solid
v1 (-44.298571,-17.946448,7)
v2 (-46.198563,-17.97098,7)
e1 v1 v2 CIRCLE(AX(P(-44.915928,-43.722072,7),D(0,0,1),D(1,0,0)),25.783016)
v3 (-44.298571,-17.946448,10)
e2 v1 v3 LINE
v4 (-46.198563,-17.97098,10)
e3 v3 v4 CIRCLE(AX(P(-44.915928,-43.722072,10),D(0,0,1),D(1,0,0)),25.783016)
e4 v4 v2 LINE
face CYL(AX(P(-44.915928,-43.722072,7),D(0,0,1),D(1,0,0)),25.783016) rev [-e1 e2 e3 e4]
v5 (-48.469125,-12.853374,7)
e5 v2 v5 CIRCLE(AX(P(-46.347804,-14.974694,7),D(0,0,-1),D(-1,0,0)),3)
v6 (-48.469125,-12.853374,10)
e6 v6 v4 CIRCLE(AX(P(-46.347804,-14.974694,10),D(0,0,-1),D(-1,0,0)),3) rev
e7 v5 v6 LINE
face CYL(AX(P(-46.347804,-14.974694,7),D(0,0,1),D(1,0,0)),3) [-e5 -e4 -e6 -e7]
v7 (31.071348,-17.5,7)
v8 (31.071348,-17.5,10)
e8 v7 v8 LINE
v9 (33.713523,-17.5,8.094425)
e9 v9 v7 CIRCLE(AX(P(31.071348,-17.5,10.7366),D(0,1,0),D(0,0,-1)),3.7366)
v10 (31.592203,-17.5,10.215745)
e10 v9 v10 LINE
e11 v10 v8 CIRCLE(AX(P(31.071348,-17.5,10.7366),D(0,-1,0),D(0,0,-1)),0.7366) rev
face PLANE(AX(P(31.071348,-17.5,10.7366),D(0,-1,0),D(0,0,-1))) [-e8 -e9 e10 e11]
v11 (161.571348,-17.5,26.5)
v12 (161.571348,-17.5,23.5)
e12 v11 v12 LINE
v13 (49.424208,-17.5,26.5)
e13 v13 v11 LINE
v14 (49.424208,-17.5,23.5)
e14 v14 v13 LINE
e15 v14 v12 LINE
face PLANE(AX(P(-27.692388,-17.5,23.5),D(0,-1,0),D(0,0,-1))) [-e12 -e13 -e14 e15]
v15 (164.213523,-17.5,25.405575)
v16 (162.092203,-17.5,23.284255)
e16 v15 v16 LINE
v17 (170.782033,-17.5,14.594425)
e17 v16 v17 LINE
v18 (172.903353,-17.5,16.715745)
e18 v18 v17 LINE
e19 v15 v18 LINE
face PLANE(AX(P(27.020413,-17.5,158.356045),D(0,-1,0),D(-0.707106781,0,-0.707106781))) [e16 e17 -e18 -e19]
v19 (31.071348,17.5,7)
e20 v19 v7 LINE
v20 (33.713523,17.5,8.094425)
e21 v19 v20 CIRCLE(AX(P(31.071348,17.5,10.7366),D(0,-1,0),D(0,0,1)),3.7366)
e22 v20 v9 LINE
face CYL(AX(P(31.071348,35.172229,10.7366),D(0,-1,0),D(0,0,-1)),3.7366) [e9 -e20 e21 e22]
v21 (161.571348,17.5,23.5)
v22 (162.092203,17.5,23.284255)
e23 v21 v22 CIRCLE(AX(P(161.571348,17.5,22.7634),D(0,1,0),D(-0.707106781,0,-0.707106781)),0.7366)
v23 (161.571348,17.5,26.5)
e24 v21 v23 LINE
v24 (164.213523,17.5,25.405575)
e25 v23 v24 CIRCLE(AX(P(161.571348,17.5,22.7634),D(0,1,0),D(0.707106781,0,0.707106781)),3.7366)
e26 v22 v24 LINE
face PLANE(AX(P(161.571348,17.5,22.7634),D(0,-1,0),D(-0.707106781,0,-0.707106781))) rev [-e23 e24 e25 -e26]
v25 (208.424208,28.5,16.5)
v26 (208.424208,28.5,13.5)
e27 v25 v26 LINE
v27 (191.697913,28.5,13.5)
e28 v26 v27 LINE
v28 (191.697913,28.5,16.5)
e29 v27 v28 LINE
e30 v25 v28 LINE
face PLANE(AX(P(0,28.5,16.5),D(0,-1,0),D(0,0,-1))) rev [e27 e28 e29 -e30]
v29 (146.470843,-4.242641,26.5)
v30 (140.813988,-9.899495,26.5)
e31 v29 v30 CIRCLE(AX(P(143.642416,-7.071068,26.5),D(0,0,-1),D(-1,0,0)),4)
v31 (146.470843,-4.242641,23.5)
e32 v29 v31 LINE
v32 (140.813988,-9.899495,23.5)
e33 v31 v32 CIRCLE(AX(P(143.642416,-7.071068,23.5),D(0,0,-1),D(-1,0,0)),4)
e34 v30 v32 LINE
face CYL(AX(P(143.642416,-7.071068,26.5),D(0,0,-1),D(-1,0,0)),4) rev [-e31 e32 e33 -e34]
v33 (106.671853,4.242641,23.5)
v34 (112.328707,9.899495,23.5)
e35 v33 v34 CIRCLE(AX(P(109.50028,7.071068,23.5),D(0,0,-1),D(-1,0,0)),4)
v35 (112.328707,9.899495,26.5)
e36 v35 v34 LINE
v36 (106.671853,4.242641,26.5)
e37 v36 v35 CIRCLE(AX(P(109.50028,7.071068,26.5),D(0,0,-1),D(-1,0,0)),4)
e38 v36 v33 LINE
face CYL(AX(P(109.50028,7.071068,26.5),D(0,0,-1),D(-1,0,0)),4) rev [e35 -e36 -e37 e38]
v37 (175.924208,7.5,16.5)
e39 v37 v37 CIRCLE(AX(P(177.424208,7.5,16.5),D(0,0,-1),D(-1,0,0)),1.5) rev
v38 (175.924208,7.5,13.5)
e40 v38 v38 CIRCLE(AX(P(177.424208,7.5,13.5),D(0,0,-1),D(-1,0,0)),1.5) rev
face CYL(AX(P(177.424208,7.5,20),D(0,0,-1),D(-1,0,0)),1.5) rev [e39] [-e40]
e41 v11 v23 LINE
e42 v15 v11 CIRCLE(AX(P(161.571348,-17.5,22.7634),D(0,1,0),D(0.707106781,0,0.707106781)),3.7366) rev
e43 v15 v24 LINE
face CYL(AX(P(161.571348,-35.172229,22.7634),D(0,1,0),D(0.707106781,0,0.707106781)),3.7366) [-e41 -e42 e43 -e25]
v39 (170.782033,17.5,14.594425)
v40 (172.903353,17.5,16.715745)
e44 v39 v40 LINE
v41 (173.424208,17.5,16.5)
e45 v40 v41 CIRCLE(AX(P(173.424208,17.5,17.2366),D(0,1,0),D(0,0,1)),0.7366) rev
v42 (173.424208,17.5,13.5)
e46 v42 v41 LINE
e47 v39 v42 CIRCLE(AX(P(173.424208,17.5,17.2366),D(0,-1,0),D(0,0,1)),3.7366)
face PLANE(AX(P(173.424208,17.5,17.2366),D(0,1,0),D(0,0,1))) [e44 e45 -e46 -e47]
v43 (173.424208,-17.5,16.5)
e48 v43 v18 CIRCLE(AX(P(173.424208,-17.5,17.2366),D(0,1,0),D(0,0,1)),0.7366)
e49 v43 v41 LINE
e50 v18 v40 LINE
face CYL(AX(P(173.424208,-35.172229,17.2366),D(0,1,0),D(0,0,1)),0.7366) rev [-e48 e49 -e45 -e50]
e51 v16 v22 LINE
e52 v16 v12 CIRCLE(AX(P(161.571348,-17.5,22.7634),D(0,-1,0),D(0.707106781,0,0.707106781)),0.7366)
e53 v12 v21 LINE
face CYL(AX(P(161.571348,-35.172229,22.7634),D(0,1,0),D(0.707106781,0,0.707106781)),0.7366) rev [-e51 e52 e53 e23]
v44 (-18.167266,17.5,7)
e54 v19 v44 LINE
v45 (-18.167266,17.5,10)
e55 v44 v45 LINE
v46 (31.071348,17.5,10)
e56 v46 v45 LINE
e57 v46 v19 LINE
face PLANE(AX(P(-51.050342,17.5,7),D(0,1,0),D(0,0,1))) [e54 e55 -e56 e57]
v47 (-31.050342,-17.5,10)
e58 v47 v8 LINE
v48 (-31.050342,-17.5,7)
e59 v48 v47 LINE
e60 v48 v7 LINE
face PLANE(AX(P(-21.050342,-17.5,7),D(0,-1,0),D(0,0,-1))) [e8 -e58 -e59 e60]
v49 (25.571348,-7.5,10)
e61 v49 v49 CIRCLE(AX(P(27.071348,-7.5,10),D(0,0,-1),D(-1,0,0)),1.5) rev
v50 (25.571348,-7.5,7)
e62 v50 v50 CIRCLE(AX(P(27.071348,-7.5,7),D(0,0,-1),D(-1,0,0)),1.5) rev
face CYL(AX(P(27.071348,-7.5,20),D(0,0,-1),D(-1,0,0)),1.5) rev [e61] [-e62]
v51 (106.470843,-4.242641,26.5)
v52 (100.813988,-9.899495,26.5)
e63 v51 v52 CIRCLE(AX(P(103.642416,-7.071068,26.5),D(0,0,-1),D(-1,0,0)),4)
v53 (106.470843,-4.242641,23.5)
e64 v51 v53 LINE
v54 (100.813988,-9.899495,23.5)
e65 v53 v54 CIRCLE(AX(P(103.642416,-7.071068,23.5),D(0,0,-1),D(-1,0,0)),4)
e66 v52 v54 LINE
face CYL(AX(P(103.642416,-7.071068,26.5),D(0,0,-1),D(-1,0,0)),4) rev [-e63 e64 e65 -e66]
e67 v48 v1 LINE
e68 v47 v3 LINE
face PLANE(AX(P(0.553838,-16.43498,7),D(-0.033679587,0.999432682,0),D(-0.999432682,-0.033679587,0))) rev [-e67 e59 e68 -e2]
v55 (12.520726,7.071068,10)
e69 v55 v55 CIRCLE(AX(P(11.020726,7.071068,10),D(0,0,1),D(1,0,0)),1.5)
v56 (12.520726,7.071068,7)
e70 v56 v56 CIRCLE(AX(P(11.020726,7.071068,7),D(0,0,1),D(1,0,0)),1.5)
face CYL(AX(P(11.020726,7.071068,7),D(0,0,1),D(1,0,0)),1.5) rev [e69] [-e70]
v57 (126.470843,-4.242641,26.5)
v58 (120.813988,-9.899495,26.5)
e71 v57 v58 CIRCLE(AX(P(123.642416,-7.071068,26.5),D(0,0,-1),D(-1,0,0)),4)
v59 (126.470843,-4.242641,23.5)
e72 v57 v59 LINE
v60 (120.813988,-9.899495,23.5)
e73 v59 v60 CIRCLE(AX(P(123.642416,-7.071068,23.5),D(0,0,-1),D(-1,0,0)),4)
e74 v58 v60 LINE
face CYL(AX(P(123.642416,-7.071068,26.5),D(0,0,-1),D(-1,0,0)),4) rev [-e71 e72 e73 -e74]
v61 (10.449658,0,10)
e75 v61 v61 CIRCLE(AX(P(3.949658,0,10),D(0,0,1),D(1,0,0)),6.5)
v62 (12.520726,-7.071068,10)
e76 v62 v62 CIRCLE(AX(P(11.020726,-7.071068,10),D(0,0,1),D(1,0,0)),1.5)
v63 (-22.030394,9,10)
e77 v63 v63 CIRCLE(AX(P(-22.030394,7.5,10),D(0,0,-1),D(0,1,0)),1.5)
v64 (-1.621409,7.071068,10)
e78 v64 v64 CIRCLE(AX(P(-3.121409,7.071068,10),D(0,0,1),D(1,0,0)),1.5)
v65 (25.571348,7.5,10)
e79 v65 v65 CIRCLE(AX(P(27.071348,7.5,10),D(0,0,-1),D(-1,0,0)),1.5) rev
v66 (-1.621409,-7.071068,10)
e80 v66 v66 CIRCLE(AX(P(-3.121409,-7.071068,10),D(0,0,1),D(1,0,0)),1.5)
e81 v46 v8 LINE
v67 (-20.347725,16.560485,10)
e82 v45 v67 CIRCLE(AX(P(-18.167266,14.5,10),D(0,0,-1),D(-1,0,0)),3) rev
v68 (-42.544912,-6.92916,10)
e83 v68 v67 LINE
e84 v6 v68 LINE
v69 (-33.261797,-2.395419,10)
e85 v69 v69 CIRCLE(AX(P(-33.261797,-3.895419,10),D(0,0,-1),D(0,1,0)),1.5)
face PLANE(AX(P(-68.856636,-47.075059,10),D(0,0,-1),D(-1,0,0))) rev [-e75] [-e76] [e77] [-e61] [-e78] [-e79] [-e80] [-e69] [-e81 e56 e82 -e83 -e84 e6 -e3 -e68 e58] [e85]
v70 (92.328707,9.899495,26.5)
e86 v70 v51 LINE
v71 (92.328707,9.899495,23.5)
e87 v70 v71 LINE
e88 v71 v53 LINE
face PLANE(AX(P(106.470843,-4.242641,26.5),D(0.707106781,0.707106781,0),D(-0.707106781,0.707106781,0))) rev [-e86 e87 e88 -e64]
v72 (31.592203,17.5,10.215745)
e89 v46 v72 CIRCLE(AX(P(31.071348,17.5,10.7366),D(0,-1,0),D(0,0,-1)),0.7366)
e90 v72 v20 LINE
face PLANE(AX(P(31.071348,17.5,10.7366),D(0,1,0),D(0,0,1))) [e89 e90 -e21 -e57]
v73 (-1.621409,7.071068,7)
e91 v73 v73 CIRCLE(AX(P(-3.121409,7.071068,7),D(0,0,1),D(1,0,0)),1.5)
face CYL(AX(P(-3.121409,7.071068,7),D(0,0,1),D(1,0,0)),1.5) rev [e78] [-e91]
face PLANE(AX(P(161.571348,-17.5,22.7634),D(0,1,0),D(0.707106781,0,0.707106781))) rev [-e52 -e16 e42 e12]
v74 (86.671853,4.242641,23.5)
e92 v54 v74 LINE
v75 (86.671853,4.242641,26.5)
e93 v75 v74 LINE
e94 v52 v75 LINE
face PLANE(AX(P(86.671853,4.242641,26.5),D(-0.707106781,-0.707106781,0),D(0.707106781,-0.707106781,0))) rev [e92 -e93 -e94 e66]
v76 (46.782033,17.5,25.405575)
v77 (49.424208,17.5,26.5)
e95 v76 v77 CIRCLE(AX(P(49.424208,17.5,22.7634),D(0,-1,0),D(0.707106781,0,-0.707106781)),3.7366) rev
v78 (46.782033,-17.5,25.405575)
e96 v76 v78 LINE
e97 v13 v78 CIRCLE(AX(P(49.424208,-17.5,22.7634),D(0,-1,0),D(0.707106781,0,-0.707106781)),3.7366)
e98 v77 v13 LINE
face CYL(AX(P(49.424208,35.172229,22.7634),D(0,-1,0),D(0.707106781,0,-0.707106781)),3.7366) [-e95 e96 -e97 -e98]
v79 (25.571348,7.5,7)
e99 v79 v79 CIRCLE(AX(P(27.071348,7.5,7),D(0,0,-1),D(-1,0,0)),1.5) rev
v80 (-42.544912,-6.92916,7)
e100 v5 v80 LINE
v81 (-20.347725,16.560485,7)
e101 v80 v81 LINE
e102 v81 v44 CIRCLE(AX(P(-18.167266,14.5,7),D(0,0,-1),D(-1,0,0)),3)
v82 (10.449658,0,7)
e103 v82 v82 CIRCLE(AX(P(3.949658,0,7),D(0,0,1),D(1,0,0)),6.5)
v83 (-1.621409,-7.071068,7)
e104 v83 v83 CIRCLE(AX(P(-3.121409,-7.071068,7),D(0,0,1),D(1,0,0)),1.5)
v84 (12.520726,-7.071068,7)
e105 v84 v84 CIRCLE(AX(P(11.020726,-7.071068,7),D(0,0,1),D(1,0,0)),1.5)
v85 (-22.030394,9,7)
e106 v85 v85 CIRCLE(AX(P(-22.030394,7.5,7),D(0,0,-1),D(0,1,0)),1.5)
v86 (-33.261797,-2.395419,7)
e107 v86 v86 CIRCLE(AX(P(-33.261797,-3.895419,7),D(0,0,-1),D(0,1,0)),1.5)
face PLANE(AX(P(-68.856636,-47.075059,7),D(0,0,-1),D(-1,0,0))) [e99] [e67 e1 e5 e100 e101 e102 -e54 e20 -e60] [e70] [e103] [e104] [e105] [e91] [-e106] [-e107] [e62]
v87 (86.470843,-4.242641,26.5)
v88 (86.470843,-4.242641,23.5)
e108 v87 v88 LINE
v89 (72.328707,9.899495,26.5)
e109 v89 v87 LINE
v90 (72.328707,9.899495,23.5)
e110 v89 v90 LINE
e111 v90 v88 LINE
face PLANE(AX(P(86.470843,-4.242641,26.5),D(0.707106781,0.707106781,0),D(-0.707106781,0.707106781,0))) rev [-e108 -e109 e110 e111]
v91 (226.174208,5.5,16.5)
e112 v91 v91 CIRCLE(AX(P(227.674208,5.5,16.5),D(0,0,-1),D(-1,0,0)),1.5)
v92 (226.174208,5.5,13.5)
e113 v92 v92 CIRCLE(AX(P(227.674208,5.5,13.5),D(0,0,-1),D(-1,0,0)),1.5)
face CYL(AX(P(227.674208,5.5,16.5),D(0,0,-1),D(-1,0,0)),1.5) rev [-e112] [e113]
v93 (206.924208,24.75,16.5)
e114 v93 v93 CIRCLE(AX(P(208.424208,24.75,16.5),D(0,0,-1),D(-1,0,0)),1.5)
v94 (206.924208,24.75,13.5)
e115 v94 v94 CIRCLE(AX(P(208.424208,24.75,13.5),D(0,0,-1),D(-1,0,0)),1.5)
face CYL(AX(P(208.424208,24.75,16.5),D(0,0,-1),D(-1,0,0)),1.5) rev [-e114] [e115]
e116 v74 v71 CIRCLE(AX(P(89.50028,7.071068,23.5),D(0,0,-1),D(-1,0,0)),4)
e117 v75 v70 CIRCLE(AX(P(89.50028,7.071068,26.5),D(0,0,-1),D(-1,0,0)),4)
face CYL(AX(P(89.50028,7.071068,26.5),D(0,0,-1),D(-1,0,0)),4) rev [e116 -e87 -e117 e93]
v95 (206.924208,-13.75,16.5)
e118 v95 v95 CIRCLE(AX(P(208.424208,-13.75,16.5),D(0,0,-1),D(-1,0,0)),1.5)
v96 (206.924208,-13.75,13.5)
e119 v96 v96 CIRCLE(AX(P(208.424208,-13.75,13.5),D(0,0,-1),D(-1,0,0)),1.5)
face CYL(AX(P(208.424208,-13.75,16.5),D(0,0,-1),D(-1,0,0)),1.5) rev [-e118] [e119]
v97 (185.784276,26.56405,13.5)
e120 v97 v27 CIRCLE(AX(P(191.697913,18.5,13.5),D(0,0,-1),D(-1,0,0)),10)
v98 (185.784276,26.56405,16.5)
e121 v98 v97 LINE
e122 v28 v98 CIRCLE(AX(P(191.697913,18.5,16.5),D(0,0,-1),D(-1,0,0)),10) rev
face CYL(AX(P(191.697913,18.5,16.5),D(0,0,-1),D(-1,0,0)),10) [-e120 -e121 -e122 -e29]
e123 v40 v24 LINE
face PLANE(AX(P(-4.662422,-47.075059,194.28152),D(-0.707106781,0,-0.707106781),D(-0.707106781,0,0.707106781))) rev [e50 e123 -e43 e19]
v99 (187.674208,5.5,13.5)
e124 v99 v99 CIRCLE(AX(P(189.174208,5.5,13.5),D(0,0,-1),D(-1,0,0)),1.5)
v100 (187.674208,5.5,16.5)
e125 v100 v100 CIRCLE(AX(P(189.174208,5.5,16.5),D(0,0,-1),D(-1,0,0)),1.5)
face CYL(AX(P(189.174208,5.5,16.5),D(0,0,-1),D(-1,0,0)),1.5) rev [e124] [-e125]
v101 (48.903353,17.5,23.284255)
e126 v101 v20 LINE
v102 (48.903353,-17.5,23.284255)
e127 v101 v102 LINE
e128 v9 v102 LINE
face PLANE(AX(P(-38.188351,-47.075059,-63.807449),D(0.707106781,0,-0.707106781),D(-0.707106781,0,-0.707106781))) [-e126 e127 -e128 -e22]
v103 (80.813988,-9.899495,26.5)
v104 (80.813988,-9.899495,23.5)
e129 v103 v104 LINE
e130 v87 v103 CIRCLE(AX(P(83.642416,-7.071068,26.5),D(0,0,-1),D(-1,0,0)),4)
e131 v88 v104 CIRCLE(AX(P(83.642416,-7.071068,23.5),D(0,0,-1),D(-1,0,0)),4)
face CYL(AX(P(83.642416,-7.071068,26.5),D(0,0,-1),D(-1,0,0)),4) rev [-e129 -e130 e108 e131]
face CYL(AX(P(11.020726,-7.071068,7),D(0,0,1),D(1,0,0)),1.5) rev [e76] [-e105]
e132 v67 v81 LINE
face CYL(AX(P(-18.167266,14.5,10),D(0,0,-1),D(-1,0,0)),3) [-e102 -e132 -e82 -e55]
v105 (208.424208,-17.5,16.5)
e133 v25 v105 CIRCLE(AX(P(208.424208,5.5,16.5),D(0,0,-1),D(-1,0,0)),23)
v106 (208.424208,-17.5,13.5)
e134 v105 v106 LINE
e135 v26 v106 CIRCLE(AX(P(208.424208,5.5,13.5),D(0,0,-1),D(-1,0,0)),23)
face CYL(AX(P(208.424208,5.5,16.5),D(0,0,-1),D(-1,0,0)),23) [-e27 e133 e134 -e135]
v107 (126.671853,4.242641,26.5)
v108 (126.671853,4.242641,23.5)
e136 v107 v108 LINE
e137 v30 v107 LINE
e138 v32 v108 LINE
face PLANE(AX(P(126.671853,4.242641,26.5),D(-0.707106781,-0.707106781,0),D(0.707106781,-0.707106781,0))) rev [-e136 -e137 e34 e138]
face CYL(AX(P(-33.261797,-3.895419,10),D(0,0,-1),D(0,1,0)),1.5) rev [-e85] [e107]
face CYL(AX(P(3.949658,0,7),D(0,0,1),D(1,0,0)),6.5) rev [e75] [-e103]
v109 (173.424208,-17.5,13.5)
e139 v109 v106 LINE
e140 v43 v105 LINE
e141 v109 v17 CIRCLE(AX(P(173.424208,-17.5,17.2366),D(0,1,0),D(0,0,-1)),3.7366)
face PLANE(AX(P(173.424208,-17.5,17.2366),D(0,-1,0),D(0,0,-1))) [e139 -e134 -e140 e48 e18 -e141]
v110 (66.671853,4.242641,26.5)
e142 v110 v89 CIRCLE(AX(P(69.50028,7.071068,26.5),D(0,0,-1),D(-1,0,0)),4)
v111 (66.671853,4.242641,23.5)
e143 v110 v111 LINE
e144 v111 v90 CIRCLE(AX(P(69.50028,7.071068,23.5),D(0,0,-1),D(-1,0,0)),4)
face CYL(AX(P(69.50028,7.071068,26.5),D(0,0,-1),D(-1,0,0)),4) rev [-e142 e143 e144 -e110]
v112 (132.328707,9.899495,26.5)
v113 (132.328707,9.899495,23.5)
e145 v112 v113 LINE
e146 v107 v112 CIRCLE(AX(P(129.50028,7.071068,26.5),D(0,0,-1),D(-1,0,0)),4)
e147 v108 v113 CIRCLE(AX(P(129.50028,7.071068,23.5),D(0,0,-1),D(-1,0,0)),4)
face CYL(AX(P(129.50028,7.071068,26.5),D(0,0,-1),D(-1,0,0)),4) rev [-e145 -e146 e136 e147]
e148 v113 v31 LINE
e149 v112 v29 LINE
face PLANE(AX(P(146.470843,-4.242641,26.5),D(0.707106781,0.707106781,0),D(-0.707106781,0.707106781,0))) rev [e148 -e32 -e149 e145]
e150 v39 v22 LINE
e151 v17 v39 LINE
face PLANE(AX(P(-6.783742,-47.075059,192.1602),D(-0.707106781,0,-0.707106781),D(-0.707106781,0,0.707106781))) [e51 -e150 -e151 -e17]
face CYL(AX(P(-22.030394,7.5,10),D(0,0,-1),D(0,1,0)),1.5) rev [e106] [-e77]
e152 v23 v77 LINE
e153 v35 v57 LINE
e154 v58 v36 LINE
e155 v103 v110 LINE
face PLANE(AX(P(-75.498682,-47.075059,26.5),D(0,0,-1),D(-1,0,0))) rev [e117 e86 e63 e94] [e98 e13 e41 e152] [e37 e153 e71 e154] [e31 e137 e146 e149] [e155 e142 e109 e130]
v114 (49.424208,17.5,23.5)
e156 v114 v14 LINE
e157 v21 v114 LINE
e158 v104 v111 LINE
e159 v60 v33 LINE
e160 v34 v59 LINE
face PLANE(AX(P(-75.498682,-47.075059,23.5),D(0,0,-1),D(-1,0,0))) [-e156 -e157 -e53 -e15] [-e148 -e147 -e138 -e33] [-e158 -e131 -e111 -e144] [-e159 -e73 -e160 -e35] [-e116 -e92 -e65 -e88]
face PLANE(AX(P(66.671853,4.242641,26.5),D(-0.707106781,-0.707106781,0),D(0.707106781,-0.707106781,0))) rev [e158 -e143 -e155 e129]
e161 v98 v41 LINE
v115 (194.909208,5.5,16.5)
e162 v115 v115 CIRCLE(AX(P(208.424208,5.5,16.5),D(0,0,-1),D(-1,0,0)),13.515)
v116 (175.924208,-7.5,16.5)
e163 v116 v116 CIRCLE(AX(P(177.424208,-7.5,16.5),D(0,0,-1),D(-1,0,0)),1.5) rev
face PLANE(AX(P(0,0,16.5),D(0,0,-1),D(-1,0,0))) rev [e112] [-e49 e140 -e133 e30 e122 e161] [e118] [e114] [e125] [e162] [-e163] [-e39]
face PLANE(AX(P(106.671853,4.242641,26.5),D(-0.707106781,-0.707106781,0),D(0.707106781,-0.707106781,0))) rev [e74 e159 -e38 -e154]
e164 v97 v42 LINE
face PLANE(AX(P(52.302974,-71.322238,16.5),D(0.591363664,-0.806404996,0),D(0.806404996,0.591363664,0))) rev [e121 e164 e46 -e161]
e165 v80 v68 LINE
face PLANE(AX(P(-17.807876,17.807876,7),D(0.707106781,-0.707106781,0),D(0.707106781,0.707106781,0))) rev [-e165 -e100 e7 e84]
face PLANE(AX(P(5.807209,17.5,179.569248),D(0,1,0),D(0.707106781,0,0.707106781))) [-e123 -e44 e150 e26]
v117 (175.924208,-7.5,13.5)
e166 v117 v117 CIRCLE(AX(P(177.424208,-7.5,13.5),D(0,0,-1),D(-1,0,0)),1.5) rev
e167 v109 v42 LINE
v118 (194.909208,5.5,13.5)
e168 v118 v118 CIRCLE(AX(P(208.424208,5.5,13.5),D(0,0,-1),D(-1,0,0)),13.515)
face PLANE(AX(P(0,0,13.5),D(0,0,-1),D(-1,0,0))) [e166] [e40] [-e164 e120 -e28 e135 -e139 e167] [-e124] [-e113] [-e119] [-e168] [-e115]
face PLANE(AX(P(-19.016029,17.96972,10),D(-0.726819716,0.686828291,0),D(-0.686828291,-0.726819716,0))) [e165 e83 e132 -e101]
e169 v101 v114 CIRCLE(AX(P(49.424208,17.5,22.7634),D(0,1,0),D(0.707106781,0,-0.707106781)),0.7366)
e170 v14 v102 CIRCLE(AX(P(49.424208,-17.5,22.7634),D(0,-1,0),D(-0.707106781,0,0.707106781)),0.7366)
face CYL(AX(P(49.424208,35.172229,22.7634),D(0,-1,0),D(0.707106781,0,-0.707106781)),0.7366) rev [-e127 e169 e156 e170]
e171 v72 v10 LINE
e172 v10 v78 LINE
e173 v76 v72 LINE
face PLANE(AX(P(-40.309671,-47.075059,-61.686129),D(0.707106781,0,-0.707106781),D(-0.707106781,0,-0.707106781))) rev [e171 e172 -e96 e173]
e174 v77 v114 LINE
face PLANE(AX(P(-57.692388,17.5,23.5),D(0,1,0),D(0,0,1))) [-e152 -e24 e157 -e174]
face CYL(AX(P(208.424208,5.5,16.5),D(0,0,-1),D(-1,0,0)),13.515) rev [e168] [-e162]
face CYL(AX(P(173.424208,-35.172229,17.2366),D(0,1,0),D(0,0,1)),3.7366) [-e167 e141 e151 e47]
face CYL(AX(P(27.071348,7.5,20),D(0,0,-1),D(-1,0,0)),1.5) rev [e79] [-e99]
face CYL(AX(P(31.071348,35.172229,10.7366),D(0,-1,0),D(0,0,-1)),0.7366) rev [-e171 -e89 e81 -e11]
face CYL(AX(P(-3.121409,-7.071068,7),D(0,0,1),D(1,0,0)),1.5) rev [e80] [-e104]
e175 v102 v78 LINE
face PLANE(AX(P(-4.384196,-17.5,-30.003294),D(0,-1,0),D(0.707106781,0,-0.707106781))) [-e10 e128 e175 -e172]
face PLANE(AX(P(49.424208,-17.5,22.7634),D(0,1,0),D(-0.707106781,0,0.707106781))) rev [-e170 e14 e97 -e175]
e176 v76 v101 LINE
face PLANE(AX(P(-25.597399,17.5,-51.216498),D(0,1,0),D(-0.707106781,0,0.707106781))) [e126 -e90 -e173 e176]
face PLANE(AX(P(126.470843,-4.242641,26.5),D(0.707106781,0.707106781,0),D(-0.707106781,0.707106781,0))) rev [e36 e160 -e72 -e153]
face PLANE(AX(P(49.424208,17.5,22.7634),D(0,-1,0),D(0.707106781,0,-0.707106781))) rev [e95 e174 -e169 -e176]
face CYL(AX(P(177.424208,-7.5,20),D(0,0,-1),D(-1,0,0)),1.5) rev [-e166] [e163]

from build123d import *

# Parameters (mm, degrees)
SKETCH_1_R               = 6.5
SKETCH_1_R_2             = 1.5
SM_BASE_FLANGE_1_DEPTH   = 3
OTHER_START              = -17.5
OTHER_1_DEPTH            = 35
OTHER_1_2_DEPTH          = 35
SKETCH_7_W               = 142
SKETCH_7_H               = 35
EXTRUDE_1_DEPTH          = 3
OTHER_2_DEPTH            = 35
OTHER_START_2            = 8.571067912
OTHER_2_2_DEPTH          = 8.928932088
OTHER_2_3_DEPTH          = 26.071067912
OTHER_START_3            = 7
OTHER_2_4_OUTLINE_R      = 6.5
OTHER_2_4_OUTLINE_R_2    = 1.5
OTHER_2_4_DEPTH          = 3
OTHER_START_4            = 13.5
OTHER_2_5_OUTLINE_W      = 3.949658474
OTHER_2_5_OUTLINE_H      = 35
OTHER_2_5_DEPTH          = 3
SKETCH_9_W               = 40.525450659
SKETCH_9_H               = 35
CUT_EXTRUDE_1_DEPTH      = 216.548037247
EXTRUDE_START            = -6.5
SKETCH_10_R              = 13.515
SKETCH_10_R_2            = 1.5
EXTRUDE_2_DEPTH          = 3
FILLET_2_R               = 10
EXTRUDE_START_2          = -3
EXTRUDE_3_DEPTH          = 3
CUT_EXTRUDE_2_DEPTH      = 3
FILLET_3_R               = 3
SKETCH_13_R              = 1.5
CUT_EXTRUDE_3_DEPTH      = 3
CUT_EXTRUDE_4_DEPTH      = 10
CUT_EXTRUDE_4_DEPTH_BACK = 10
SKETCH_14_R              = 1.5
CUT_EXTRUDE_5_DEPTH      = 234.75556456


with BuildPart() as part:
    # 基体-法兰1: sheet metal written as solids
    # Sketch 1 → 基体-法兰1 (new body)
    with BuildSketch(Plane.XY):
        with BuildLine():
            Line((-55, -2.5), (-55, 17.5))
            Line((-55, 17.5), (-25, 17.5))
            Line((-25, 17.5), (25, 17.5))
            Line((25, 17.5), (68, 17.5))
            Line((68, 17.5), (68, -17.5))
            Line((68, -17.5), (25, -17.5))
            Line((25, -17.5), (-25, -17.5))
            Line((-25, -17.5), (-35, -17.5))
            ThreePointArc((-35, -17.5), (-44.006294251, -8.675059002), (-55, -2.5))
        make_face()
        Circle(SKETCH_1_R, mode=Mode.SUBTRACT)
        with Locations((7.071067812, 7.071067812)):
            Circle(SKETCH_1_R_2, mode=Mode.SUBTRACT)
        with Locations((7.071067812, -7.071067812)):
            Circle(SKETCH_1_R_2, mode=Mode.SUBTRACT)
        with Locations((-7.071067812, -7.071067812)):
            Circle(SKETCH_1_R_2, mode=Mode.SUBTRACT)
        with Locations((-7.071067812, 7.071067812)):
            Circle(SKETCH_1_R_2, mode=Mode.SUBTRACT)
    extrude(amount=-SM_BASE_FLANGE_1_DEPTH)

    # Other 1: read off the stored shape, not the designer's step
    # Other 1 outline → Other 1 (cut)
    with BuildSketch(Plane(origin=(0, 0, 0), x_dir=(1, 0, 0), z_dir=(0, 1, 0)).offset(OTHER_START)):
        with BuildLine():
            Line((29.763864432, 1.905575199), (31.669439631, 0))
            Line((31.669439631, 0), (68, 0))
            Line((68, 0), (68, 3))
            Line((68, 3), (27.121689234, 3))
            ThreePointArc((27.121689234, 3), (28.551624147, 2.715568261), (29.763864432, 1.905575199))
        make_face()
    extrude(amount=OTHER_1_DEPTH, mode=Mode.SUBTRACT)

    # Other 1 2 outline → Other 1 2 (add)
    with BuildSketch(Plane(origin=(0, 0, 0), x_dir=(1, 0, 0), z_dir=(0, 1, 0)).offset(OTHER_START)):
        with BuildLine():
            ThreePointArc((45.474549341, -13.5), (45.192664725, -13.443929664), (44.953694486, -13.284254855))
            Line((44.953694486, -13.284254855), (31.669439631, 0))
            Line((31.669439631, 0), (27.121689234, 0))
            ThreePointArc((27.121689234, 0), (27.40357385, -0.056070336), (27.642544089, -0.215745145))
            Line((27.642544089, -0.215745145), (42.832374142, -15.405575199))
            ThreePointArc((42.832374142, -15.405575199), (44.044614428, -16.215568261), (45.474549341, -16.5))
            Line((45.474549341, -16.5), (68, -16.5))
            Line((68, -16.5), (68, -13.5))
            Line((68, -13.5), (45.474549341, -13.5))
        make_face()
    extrude(amount=OTHER_1_2_DEPTH)

    # 草图7 → 凸台-拉伸1 (add)
    with BuildSketch(Plane.XY.offset(16.5)):
        with Locations((139, 0)):
            Rectangle(SKETCH_7_W, SKETCH_7_H)
    extrude(amount=-EXTRUDE_1_DEPTH)

    # Other 2: read off the stored shape, not the designer's step
    # Other 2 outline → Other 2 (cut)
    with BuildSketch(Plane(origin=(0, 0, 0), x_dir=(1, 0, 0), z_dir=(0, 1, 0)).offset(OTHER_START)):
        with BuildLine():
            Line((45.474549341, -16.5), (168.876457417, -16.5))
            Line((168.876457417, -16.5), (170.782032616, -14.594424801))
            ThreePointArc((170.782032616, -14.594424801), (171.994272902, -13.784431739), (173.424207815, -13.5))
            Line((173.424207815, -13.5), (45.474549341, -13.5))
            ThreePointArc((45.474549341, -13.5), (45.192664725, -13.443929664), (44.953694486, -13.284254855))
            Line((44.953694486, -13.284254855), (29.763864432, 1.905575199))
            ThreePointArc((29.763864432, 1.905575199), (28.551624147, 2.715568261), (27.121689234, 3))
            Line((27.121689234, 3), (-55, 3))
            Line((-55, 3), (-55, 0))
            Line((-55, 0), (27.121689234, 0))
            ThreePointArc((27.121689234, 0), (27.40357385, -0.056070336), (27.642544089, -0.215745145))
            Line((27.642544089, -0.215745145), (42.832374142, -15.405575199))
            ThreePointArc((42.832374142, -15.405575199), (44.044614428, -16.215568261), (45.474549341, -16.5))
        make_face()
    extrude(amount=OTHER_2_DEPTH, mode=Mode.SUBTRACT)

    # Other 2 2 outline → Other 2 2 (add)
    with BuildSketch(Plane(origin=(0, 0, 0), x_dir=(1, 0, 0), z_dir=(0, 1, 0)).offset(OTHER_START_2)):
        with BuildLine():
            Line((49.424207815, -26.5), (161.571347708, -26.5))
            ThreePointArc((161.571347708, -26.5), (163.001282621, -26.215568261), (164.213522906, -25.405575199))
            Line((164.213522906, -25.405575199), (172.90335296, -16.715745145))
            ThreePointArc((172.90335296, -16.715745145), (173.142323199, -16.556070336), (173.424207815, -16.5))
            Line((173.424207815, -16.5), (168.876457417, -16.5))
            Line((168.876457417, -16.5), (162.092202563, -23.284254855))
            ThreePointArc((162.092202563, -23.284254855), (161.853232324, -23.443929664), (161.571347708, -23.5))
            Line((161.571347708, -23.5), (49.424207815, -23.5))
            ThreePointArc((49.424207815, -23.5), (49.142323199, -23.443929664), (48.90335296, -23.284254855))
            Line((48.90335296, -23.284254855), (33.713522906, -8.094424801))
            ThreePointArc((33.713522906, -8.094424801), (32.501282621, -7.284431739), (31.071347708, -7))
            Line((31.071347708, -7), (-51.050341526, -7))
            Line((-51.050341526, -7), (-51.050341526, -10))
            Line((-51.050341526, -10), (31.071347708, -10))
            ThreePointArc((31.071347708, -10), (31.353232324, -10.056070336), (31.592202563, -10.215745145))
            Line((31.592202563, -10.215745145), (46.782032616, -25.405575199))
            ThreePointArc((46.782032616, -25.405575199), (47.994272902, -26.215568261), (49.424207815, -26.5))
        make_face()
    extrude(amount=OTHER_2_2_DEPTH)

    # Other 2 3 outline → Other 2 3 (add)
    with BuildSketch(Plane(origin=(0, 0, 0), x_dir=(1, 0, 0), z_dir=(0, 1, 0)).offset(OTHER_START)):
        with BuildLine():
            Line((49.424207815, -26.5), (161.571347708, -26.5))
            ThreePointArc((161.571347708, -26.5), (163.001282621, -26.215568261), (164.213522906, -25.405575199))
            Line((164.213522906, -25.405575199), (172.90335296, -16.715745145))
            ThreePointArc((172.90335296, -16.715745145), (173.142323199, -16.556070336), (173.424207815, -16.5))
            Line((173.424207815, -16.5), (168.876457417, -16.5))
            Line((168.876457417, -16.5), (162.092202563, -23.284254855))
            ThreePointArc((162.092202563, -23.284254855), (161.853232324, -23.443929664), (161.571347708, -23.5))
            Line((161.571347708, -23.5), (49.424207815, -23.5))
            ThreePointArc((49.424207815, -23.5), (49.142323199, -23.443929664), (48.90335296, -23.284254855))
            Line((48.90335296, -23.284254855), (33.713522906, -8.094424801))
            ThreePointArc((33.713522906, -8.094424801), (32.501282621, -7.284431739), (31.071347708, -7))
            Line((31.071347708, -7), (-51.050341526, -7))
            Line((-51.050341526, -7), (-51.050341526, -10))
            Line((-51.050341526, -10), (31.071347708, -10))
            ThreePointArc((31.071347708, -10), (31.353232324, -10.056070336), (31.592202563, -10.215745145))
            Line((31.592202563, -10.215745145), (46.782032616, -25.405575199))
            ThreePointArc((46.782032616, -25.405575199), (47.994272902, -26.215568261), (49.424207815, -26.5))
        make_face()
    extrude(amount=OTHER_2_3_DEPTH)

    # Other 2 4 outline → Other 2 4 (cut)
    with BuildSketch(Plane.XY.offset(OTHER_START_3)):
        with BuildLine():
            Line((-51.050341526, -17.5), (-31.050341526, -17.5))
            ThreePointArc((-31.050341526, -17.5), (-40.056635778, -8.675059002), (-51.050341526, -2.5))
            Line((-51.050341526, -2.5), (-51.050341526, -17.5))
        make_face()
        with Locations((3.949658474, 0)):
            Circle(OTHER_2_4_OUTLINE_R)
        with Locations((11.020726286, 7.071067812)):
            Circle(OTHER_2_4_OUTLINE_R_2)
        with Locations((11.020726286, -7.071067812)):
            Circle(OTHER_2_4_OUTLINE_R_2)
        with Locations((-3.121409338, -7.071067812)):
            Circle(OTHER_2_4_OUTLINE_R_2)
        with Locations((-3.121409338, 7.071067812)):
            Circle(OTHER_2_4_OUTLINE_R_2)
    extrude(amount=OTHER_2_4_DEPTH, mode=Mode.SUBTRACT)

    # Other 2 5 outline → Other 2 5 (add)
    with BuildSketch(Plane.XY.offset(OTHER_START_4)):
        with Locations((211.974829237, 0)):
            Rectangle(OTHER_2_5_OUTLINE_W, OTHER_2_5_OUTLINE_H)
    extrude(amount=OTHER_2_5_DEPTH)

    # 草图9 → 切除-拉伸1 (cut, through all)
    with BuildSketch(Plane(origin=(0, 0, 7), x_dir=(-1, 0, 0), z_dir=(0, 0, -1))):
        with Locations((-193.686933145, 0)):
            Rectangle(SKETCH_9_W, SKETCH_9_H)
    extrude(amount=-CUT_EXTRUDE_1_DEPTH, mode=Mode.SUBTRACT)

    # 草图10 → 凸台-拉伸2 (add)
    with BuildSketch(Plane(origin=(0, 0, 7), x_dir=(-1, 0, 0), z_dir=(0, 0, -1)).offset(EXTRUDE_START)):
        with BuildLine():
            Line((-188.424207815, 28.5), (-208.424207815, 28.5))
            ThreePointArc((-208.424207815, 28.5), (-231.424207815, 5.5), (-208.424207815, -17.5))
            Line((-208.424207815, -17.5), (-173.424207815, -17.5))
            Line((-173.424207815, -17.5), (-173.424207815, 17.5))
            Line((-173.424207815, 17.5), (-188.424207815, 28.5))
        make_face()
        with Locations((-208.424207815, 5.5)):
            Circle(SKETCH_10_R, mode=Mode.SUBTRACT)
        with Locations((-208.424207815, 24.75)):
            Circle(SKETCH_10_R_2, mode=Mode.SUBTRACT)
        with Locations((-208.424207815, -13.75)):
            Circle(SKETCH_10_R_2, mode=Mode.SUBTRACT)
        with Locations((-189.174207815, 5.5)):
            Circle(SKETCH_10_R_2, mode=Mode.SUBTRACT)
        with Locations((-227.674207815, 5.5)):
            Circle(SKETCH_10_R_2, mode=Mode.SUBTRACT)
    extrude(amount=-EXTRUDE_2_DEPTH)

    # 圆角2
    fillet_2_edges = [part.edges().sort_by_distance(p)[0] for p in [
        (188.424207815, 28.5, 15),
    ]]
    fillet(fillet_2_edges, radius=FILLET_2_R)

    # 草图11 → 凸台-拉伸3 (add)
    with BuildSketch(Plane.XY.offset(10).offset(EXTRUDE_START_2)):
        with BuildLine():
            Line((-42.544911581, -6.929160459), (-56.113121262, -20.49737014))
            ThreePointArc((-56.113121262, -20.49737014), (-50.357438279, -18.519812605), (-44.298570923, -17.946448179))
            Line((-44.298570923, -17.946448179), (-31.050341526, -17.5))
            ThreePointArc((-31.050341526, -17.5), (-36.364856286, -11.743992425), (-42.544911581, -6.929160459))
        make_face()
    extrude(amount=EXTRUDE_3_DEPTH)

    # 草图12 → 切除-拉伸2 (cut)
    with BuildSketch(Plane(origin=(0, 0, 7), x_dir=(-1, 0, 0), z_dir=(0, 0, -1))):
        with BuildLine():
            Line((19.45990418, 17.5), (42.544911581, -6.929160459))
            ThreePointArc((42.544911581, -6.929160459), (46.68674057, -4.501643042), (51.050341526, -2.5))
            Line((51.050341526, -2.5), (51.050341526, 17.5))
            Line((51.050341526, 17.5), (19.45990418, 17.5))
        make_face()
    extrude(amount=-CUT_EXTRUDE_2_DEPTH, mode=Mode.SUBTRACT)

    # 圆角3
    fillet_3_edges = [part.edges().sort_by_distance(p)[0] for p in [
        (-56.113121262, -20.49737014, 8.5),
        (-19.45990418, 17.5, 8.5),
    ]]
    fillet(fillet_3_edges, radius=FILLET_3_R)

    # 草图13 → 切除-拉伸3 (cut)
    with BuildSketch(Plane(origin=(0, 0, 7), x_dir=(-1, 0, 0), z_dir=(0, 0, -1))):
        with Locations(Location((22.03039431, 7.5, 0), (0, 0, 90))):
            Circle(SKETCH_13_R)
        with Locations(Location((33.261797443, -3.895419416, 0), (0, 0, 90))):
            Circle(SKETCH_13_R)
    extrude(amount=-CUT_EXTRUDE_3_DEPTH, mode=Mode.SUBTRACT)

    # 草图14 → 切除-拉伸4 (cut, two sides: drawn at the far end of the back side and taken through both)
    with BuildSketch(Plane.XY.offset(10).offset(-CUT_EXTRUDE_4_DEPTH_BACK)):
        with Locations(Location((177.424207815, -7.5, 0), (0, 0, 180))):
            Circle(SKETCH_14_R)
        with Locations(Location((177.424207815, 7.5, 0), (0, 0, 180))):
            Circle(SKETCH_14_R)
        with Locations(Location((27.071347708, -7.5, 0), (0, 0, 180))):
            Circle(SKETCH_14_R)
        with Locations(Location((27.071347708, 7.5, 0), (0, 0, 180))):
            Circle(SKETCH_14_R)
    extrude(amount=CUT_EXTRUDE_4_DEPTH + CUT_EXTRUDE_4_DEPTH_BACK, mode=Mode.SUBTRACT)

    # 草图15 → 切除-拉伸5 (cut, through all)
    with BuildSketch(Plane(origin=(0, 0, 23.5), x_dir=(-1, 0, 0), z_dir=(0, 0, -1))):
        with BuildLine():
            Line((-146.470842644, -4.242640687), (-132.328707021, 9.899494937))
            ThreePointArc((-132.328707021, 9.899494937), (-126.671852771, 9.899494937), (-126.671852771, 4.242640687))
            Line((-126.671852771, 4.242640687), (-140.813988395, -9.899494937))
            ThreePointArc((-140.813988395, -9.899494937), (-146.470842644, -9.899494937), (-146.470842644, -4.242640687))
        make_face()
        with BuildLine():
            Line((-106.671852771, 4.242640687), (-120.813988395, -9.899494937))
            ThreePointArc((-120.813988395, -9.899494937), (-126.470842644, -9.899494937), (-126.470842644, -4.242640687))
            Line((-126.470842644, -4.242640687), (-112.328707021, 9.899494937))
            ThreePointArc((-112.328707021, 9.899494937), (-106.671852771, 9.899494937), (-106.671852771, 4.242640687))
        make_face()
        with BuildLine():
            Line((-86.671852771, 4.242640687), (-100.813988395, -9.899494937))
            ThreePointArc((-100.813988395, -9.899494937), (-106.470842644, -9.899494937), (-106.470842644, -4.242640687))
            Line((-106.470842644, -4.242640687), (-92.328707021, 9.899494937))
            ThreePointArc((-92.328707021, 9.899494937), (-86.671852771, 9.899494937), (-86.671852771, 4.242640687))
        make_face()
        with BuildLine():
            Line((-66.671852771, 4.242640687), (-80.813988395, -9.899494937))
            ThreePointArc((-80.813988395, -9.899494937), (-86.470842644, -9.899494937), (-86.470842644, -4.242640687))
            Line((-86.470842644, -4.242640687), (-72.328707021, 9.899494937))
            ThreePointArc((-72.328707021, 9.899494937), (-66.671852771, 9.899494937), (-66.671852771, 4.242640687))
        make_face()
    extrude(amount=-CUT_EXTRUDE_5_DEPTH, mode=Mode.SUBTRACT)


solid = part.part
